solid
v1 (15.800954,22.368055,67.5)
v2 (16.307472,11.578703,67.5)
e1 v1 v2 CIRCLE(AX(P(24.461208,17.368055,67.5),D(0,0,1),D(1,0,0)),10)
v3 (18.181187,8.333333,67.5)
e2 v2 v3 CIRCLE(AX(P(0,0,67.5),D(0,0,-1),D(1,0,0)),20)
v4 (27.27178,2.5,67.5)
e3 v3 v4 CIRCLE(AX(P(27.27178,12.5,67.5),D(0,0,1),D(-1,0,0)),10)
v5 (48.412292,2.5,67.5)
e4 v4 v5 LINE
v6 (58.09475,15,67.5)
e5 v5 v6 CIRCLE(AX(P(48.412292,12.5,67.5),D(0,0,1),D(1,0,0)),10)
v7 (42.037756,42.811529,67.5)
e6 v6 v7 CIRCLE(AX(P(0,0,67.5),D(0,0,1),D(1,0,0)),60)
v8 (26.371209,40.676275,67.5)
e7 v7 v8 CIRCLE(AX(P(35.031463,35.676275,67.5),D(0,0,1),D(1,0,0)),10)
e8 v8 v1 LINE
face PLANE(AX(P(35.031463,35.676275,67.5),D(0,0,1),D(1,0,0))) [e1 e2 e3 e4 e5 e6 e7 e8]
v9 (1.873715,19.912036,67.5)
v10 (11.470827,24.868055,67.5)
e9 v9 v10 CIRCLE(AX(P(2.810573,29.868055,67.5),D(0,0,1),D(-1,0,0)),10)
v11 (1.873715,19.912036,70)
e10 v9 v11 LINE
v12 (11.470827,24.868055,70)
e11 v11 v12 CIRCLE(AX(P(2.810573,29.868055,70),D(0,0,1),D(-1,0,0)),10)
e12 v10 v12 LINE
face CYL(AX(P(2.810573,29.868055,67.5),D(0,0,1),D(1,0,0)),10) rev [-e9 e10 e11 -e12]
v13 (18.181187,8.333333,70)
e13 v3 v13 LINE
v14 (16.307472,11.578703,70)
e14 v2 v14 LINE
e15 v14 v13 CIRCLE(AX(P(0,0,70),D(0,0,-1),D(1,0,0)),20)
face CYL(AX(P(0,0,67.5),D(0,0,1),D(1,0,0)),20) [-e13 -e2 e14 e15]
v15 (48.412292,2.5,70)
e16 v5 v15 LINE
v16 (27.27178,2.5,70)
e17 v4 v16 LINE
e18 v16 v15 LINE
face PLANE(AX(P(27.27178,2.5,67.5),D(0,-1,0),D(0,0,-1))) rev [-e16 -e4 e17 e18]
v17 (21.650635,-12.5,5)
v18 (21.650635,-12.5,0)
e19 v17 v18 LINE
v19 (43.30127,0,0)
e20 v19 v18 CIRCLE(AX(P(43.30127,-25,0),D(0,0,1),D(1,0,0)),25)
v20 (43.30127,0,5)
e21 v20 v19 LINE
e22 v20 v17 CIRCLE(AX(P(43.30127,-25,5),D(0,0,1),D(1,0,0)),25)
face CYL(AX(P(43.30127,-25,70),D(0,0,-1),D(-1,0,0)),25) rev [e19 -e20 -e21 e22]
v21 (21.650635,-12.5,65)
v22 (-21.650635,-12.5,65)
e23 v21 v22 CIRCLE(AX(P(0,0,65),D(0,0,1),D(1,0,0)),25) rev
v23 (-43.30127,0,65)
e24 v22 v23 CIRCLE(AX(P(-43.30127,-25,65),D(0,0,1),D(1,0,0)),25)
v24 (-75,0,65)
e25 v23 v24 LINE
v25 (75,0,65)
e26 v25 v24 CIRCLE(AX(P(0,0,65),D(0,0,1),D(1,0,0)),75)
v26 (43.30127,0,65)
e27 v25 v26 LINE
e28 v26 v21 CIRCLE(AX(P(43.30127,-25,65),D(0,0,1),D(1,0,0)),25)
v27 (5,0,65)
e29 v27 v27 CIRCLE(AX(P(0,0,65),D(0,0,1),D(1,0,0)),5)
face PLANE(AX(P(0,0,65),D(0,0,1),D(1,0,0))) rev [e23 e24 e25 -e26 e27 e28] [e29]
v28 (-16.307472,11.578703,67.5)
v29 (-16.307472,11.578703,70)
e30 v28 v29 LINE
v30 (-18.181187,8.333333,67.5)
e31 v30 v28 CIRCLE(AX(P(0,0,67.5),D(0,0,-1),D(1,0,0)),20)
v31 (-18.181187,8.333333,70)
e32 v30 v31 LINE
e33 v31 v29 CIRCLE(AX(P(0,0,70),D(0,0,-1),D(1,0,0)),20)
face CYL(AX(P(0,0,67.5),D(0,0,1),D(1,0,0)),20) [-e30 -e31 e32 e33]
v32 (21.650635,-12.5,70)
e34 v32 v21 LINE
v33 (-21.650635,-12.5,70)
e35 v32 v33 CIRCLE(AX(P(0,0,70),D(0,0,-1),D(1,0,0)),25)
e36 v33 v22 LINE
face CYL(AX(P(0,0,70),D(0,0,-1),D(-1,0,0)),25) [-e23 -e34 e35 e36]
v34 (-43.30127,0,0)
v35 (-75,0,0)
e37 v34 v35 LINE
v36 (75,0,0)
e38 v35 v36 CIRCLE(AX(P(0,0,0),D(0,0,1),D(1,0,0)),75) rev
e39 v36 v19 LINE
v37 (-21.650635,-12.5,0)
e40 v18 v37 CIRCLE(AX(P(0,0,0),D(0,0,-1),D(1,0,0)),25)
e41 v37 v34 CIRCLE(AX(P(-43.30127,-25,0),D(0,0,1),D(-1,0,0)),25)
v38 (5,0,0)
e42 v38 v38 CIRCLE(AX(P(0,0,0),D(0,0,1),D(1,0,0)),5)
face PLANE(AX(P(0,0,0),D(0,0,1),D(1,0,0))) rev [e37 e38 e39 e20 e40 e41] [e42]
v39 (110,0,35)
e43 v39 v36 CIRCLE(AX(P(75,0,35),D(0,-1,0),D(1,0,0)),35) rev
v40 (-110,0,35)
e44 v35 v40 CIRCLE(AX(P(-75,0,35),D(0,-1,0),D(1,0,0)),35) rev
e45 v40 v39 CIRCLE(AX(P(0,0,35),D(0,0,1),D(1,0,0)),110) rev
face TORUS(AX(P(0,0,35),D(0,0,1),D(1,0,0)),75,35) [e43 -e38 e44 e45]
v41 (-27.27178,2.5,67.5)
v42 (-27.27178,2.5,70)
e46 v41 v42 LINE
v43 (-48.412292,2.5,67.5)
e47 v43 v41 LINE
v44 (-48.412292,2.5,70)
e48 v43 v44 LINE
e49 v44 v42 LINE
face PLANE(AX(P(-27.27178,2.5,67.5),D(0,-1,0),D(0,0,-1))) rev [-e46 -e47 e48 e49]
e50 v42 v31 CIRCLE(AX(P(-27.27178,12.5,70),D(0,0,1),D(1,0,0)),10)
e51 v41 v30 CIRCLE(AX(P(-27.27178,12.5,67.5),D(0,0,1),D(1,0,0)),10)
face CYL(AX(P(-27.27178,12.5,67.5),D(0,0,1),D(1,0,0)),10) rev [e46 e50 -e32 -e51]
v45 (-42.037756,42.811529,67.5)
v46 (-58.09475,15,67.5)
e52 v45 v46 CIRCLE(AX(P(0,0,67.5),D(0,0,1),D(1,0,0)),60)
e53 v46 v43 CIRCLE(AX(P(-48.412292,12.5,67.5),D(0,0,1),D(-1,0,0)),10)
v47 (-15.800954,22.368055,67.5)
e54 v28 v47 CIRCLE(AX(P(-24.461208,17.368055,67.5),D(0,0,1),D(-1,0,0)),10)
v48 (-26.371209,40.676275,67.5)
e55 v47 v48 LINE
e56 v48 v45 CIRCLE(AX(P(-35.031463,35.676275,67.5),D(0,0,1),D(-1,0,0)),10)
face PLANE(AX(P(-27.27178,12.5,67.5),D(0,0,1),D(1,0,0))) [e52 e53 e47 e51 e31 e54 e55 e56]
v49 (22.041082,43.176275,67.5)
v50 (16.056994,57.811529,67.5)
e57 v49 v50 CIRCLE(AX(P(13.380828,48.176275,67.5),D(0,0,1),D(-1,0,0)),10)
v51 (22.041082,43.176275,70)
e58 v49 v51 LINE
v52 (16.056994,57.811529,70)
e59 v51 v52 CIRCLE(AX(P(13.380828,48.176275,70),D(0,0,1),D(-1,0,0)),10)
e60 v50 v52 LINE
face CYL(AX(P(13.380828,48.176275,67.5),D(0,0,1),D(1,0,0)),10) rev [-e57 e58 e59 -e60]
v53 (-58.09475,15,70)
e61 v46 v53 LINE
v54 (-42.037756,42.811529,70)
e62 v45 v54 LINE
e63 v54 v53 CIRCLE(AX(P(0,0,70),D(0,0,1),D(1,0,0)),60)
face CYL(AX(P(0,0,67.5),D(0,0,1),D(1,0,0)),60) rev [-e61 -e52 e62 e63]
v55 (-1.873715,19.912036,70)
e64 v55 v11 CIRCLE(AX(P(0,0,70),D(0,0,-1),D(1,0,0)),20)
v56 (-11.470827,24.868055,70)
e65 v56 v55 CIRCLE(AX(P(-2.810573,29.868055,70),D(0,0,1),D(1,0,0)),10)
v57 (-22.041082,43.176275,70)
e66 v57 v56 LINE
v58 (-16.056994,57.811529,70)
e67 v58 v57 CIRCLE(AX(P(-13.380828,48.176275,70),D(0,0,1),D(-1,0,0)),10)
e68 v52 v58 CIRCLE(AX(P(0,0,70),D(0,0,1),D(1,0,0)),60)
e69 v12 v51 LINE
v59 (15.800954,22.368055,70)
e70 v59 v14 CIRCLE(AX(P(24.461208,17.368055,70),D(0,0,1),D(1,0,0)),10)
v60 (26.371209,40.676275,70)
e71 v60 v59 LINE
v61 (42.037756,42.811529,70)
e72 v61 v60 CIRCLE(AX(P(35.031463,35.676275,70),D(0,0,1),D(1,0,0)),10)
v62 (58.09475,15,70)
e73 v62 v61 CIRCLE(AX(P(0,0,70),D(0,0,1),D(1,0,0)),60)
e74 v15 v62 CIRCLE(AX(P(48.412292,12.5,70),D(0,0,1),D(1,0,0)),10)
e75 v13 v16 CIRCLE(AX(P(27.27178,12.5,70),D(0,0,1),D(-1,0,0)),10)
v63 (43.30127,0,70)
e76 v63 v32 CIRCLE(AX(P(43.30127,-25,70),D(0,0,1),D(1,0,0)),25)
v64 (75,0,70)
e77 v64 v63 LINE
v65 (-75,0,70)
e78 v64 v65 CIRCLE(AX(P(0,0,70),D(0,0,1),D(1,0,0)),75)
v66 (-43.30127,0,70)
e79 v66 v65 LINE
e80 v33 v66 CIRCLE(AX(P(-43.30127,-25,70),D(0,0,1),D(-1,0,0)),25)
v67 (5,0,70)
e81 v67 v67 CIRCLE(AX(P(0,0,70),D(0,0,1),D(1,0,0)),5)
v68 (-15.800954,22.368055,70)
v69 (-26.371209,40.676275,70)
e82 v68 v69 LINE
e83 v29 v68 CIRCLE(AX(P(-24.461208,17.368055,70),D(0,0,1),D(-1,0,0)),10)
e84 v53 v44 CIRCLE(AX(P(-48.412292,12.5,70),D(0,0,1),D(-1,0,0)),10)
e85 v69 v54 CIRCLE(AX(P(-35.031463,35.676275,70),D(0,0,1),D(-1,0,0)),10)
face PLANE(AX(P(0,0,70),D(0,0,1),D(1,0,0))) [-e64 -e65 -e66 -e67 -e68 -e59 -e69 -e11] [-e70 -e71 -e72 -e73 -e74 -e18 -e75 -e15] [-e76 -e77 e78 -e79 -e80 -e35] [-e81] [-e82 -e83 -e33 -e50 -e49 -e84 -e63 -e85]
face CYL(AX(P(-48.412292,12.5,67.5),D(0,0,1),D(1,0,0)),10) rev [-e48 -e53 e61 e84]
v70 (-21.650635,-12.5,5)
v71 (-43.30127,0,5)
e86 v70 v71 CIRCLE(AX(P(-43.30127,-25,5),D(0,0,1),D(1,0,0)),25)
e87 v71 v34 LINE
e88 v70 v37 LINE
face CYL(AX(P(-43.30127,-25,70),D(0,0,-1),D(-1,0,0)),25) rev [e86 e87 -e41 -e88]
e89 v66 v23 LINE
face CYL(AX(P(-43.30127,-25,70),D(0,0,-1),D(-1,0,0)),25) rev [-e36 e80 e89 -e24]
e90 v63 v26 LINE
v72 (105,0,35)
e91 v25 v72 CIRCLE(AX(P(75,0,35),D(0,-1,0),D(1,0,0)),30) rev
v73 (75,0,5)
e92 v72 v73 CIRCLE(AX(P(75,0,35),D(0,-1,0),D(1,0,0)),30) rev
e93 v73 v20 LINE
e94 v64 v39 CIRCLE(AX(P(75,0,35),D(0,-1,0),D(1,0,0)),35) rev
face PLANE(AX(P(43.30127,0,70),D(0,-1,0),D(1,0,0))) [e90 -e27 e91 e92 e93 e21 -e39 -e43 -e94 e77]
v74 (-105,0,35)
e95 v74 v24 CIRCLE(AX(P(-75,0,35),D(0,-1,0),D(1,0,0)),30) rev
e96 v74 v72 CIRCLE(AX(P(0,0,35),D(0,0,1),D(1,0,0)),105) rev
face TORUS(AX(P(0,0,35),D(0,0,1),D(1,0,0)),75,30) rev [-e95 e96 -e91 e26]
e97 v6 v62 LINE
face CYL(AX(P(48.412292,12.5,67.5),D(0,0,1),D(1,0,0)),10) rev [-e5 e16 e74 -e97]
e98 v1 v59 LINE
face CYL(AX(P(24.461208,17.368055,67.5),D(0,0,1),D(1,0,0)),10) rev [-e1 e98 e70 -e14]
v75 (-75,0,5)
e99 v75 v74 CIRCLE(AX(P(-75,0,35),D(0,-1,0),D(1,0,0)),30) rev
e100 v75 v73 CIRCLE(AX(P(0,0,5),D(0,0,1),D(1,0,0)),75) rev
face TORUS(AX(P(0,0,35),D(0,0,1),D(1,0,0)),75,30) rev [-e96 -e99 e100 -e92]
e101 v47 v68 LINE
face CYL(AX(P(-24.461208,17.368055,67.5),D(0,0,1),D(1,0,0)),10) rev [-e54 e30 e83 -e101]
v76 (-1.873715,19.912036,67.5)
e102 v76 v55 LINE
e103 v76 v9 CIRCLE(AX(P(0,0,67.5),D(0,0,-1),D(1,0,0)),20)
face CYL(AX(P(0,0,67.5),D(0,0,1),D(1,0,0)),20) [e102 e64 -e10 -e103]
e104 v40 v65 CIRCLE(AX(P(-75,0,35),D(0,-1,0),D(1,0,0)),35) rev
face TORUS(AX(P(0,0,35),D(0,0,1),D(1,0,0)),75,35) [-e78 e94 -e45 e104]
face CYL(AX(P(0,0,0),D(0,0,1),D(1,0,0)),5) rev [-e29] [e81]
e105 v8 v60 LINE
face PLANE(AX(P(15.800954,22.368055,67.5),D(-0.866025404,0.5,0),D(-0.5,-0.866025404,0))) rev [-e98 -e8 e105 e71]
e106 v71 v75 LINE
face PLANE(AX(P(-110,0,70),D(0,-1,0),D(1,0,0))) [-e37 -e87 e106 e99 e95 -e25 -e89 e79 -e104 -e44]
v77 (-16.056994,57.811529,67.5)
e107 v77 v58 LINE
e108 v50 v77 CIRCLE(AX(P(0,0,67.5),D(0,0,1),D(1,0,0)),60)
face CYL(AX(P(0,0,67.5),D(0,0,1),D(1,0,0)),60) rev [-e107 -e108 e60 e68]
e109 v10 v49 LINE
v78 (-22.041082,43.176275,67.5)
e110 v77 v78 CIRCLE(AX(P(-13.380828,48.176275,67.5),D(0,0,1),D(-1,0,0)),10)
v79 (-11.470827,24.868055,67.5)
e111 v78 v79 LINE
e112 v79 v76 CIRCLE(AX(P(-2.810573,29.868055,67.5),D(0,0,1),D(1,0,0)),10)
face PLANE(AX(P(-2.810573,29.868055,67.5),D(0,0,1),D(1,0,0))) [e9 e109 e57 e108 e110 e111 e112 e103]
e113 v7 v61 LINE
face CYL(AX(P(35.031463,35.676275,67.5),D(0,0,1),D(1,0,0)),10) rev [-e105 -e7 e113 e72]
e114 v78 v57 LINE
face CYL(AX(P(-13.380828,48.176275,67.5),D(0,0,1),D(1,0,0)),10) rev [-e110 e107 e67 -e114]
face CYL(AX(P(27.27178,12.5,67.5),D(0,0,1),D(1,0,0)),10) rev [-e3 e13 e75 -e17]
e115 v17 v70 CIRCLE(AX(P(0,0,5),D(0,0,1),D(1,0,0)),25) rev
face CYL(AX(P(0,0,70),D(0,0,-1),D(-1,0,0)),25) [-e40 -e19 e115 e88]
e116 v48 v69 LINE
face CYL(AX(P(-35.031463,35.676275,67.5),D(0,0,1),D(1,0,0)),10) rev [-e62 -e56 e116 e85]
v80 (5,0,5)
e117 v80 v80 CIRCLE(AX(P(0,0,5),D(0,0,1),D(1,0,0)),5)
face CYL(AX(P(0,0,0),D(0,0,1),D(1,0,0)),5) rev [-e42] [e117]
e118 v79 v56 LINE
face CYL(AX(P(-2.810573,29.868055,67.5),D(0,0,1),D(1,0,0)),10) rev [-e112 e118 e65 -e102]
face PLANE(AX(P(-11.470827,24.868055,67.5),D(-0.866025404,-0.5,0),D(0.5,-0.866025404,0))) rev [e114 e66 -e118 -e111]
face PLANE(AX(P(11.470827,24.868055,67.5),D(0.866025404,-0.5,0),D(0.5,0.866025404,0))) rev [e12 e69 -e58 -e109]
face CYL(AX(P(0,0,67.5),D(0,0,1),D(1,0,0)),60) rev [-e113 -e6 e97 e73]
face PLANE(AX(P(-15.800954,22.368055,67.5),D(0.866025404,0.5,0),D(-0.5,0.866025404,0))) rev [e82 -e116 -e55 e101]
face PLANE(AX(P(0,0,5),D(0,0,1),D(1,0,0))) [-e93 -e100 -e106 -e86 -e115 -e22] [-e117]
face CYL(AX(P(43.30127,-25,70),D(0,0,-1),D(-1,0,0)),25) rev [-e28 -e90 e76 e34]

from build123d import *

# Parameters (mm, degrees)
SKETCH1_R      = 110
EXTRUDE1_DEPTH = 70
FILLET1_R      = 35
EXTRUDE2_DEPTH = 171.587221092
SKETCH3_R      = 5
EXTRUDE3_DEPTH = 171.587221262
EXTRUDE7_DEPTH = 2.5


# Read off the part's stored shape, not the designer's step: Shell1
with BuildPart() as part:
    # Sketch1 → Extrude1 (new body)
    with BuildSketch(Plane.XY):
        Circle(SKETCH1_R)
    extrude(amount=EXTRUDE1_DEPTH)

    # Fillet1
    fillet1_edges = [part.edges().sort_by_distance(p)[0] for p in [
        (-110, 0, 0),
        (-110, 0, 70),
    ]]
    fillet(fillet1_edges, radius=FILLET1_R - 0.0001)  # a hair under: the kernel refuses the full size

    # Sketch2 → Extrude2 (cut, through all)
    with BuildSketch(Plane.XY):
        with BuildLine():
            Line((43.301270189, 0), (110, 0))
            Line((110, 0), (110, -110))
            Line((110, -110), (-110, -110))
            Line((-110, -110), (-110, 0))
            Line((-110, 0), (-43.301270189, 0))
            ThreePointArc((-43.301270189, 0), (-30.801270189, -3.349364905), (-21.650635095, -12.5))
            ThreePointArc((-21.650635095, -12.5), (0, -25), (21.650635095, -12.5))
            ThreePointArc((21.650635095, -12.5), (30.801270189, -3.349364905), (43.301270189, 0))
        make_face()
    extrude(amount=EXTRUDE2_DEPTH, mode=Mode.SUBTRACT)

    # Shell1 outline → Shell1 (revolve, cut)
    with BuildSketch(Plane.XZ):
        with BuildLine():
            Line((0, 65), (0, 5))
            Line((0, 5), (75, 5))
            ThreePointArc((75, 5), (96.213203436, 13.786796564), (105, 35))
            ThreePointArc((105, 35), (96.213203436, 56.213203436), (75, 65))
            Line((75, 65), (0, 65))
        make_face()
    revolve(axis=Axis((0, 0, 0), (0, 0, 1)), mode=Mode.SUBTRACT)

    # Sketch3 → Extrude3 (cut, through all)
    with BuildSketch(Plane.XY.offset(70)):
        Circle(SKETCH3_R)
    extrude(amount=-EXTRUDE3_DEPTH, mode=Mode.SUBTRACT)

    # Sketch5 → Extrude7 (cut)
    with BuildSketch(Plane.XY.offset(70)):
        with BuildLine():
            Line((-27.271780287, 2.5), (-48.412291828, 2.5))
            ThreePointArc((-48.412291828, 2.5), (-56.317985978, 6.376275643), (-58.094750193, 15))
            ThreePointArc((-58.094750193, 15), (-51.961524227, 30), (-42.037756153, 42.811529494))
            ThreePointArc((-42.037756153, 42.811529494), (-33.681009677, 45.584668725), (-26.371209423, 40.676274578))
            Line((-26.371209423, 40.676274578), (-15.800953653, 22.368054535))
            ThreePointArc((-15.800953653, 22.368054535), (-14.472209198, 16.899109859), (-16.307471794, 11.578703023))
            ThreePointArc((-16.307471794, 11.578703023), (-17.320508076, 10), (-18.181186858, 8.333333333))
            ThreePointArc((-18.181186858, 8.333333333), (-21.871163038, 4.083745885), (-27.271780287, 2.5))
        make_face()
        with BuildLine():
            Line((-11.470826634, 24.868054535), (-22.041082404, 43.176274578))
            ThreePointArc((-22.041082404, 43.176274578), (-22.636976301, 51.960944368), (-16.05699404, 57.811529494))
            ThreePointArc((-16.05699404, 57.811529494), (0, 60), (16.05699404, 57.811529494))
            ThreePointArc((16.05699404, 57.811529494), (22.636976301, 51.960944368), (22.041082404, 43.176274578))
            Line((22.041082404, 43.176274578), (11.470826634, 24.868054535))
            ThreePointArc((11.470826634, 24.868054535), (7.39895384, 20.982855743), (1.873715064, 19.912036356))
            ThreePointArc((1.873715064, 19.912036356), (0, 20), (-1.873715064, 19.912036356))
            ThreePointArc((-1.873715064, 19.912036356), (-7.39895384, 20.982855743), (-11.470826634, 24.868054535))
        make_face()
        with BuildLine():
            Line((27.271780287, 2.5), (48.412291828, 2.5))
            ThreePointArc((48.412291828, 2.5), (56.317985978, 6.376275643), (58.094750193, 15))
            ThreePointArc((58.094750193, 15), (51.961524227, 30), (42.037756153, 42.811529494))
            ThreePointArc((42.037756153, 42.811529494), (33.681009677, 45.584668725), (26.371209423, 40.676274578))
            Line((26.371209423, 40.676274578), (15.800953653, 22.368054535))
            ThreePointArc((15.800953653, 22.368054535), (14.472209198, 16.899109859), (16.307471794, 11.578703023))
            ThreePointArc((16.307471794, 11.578703023), (17.320508076, 10), (18.181186858, 8.333333333))
            ThreePointArc((18.181186858, 8.333333333), (21.871163038, 4.083745885), (27.271780287, 2.5))
        make_face()
    extrude(amount=-EXTRUDE7_DEPTH, mode=Mode.SUBTRACT)


solid = part.part
